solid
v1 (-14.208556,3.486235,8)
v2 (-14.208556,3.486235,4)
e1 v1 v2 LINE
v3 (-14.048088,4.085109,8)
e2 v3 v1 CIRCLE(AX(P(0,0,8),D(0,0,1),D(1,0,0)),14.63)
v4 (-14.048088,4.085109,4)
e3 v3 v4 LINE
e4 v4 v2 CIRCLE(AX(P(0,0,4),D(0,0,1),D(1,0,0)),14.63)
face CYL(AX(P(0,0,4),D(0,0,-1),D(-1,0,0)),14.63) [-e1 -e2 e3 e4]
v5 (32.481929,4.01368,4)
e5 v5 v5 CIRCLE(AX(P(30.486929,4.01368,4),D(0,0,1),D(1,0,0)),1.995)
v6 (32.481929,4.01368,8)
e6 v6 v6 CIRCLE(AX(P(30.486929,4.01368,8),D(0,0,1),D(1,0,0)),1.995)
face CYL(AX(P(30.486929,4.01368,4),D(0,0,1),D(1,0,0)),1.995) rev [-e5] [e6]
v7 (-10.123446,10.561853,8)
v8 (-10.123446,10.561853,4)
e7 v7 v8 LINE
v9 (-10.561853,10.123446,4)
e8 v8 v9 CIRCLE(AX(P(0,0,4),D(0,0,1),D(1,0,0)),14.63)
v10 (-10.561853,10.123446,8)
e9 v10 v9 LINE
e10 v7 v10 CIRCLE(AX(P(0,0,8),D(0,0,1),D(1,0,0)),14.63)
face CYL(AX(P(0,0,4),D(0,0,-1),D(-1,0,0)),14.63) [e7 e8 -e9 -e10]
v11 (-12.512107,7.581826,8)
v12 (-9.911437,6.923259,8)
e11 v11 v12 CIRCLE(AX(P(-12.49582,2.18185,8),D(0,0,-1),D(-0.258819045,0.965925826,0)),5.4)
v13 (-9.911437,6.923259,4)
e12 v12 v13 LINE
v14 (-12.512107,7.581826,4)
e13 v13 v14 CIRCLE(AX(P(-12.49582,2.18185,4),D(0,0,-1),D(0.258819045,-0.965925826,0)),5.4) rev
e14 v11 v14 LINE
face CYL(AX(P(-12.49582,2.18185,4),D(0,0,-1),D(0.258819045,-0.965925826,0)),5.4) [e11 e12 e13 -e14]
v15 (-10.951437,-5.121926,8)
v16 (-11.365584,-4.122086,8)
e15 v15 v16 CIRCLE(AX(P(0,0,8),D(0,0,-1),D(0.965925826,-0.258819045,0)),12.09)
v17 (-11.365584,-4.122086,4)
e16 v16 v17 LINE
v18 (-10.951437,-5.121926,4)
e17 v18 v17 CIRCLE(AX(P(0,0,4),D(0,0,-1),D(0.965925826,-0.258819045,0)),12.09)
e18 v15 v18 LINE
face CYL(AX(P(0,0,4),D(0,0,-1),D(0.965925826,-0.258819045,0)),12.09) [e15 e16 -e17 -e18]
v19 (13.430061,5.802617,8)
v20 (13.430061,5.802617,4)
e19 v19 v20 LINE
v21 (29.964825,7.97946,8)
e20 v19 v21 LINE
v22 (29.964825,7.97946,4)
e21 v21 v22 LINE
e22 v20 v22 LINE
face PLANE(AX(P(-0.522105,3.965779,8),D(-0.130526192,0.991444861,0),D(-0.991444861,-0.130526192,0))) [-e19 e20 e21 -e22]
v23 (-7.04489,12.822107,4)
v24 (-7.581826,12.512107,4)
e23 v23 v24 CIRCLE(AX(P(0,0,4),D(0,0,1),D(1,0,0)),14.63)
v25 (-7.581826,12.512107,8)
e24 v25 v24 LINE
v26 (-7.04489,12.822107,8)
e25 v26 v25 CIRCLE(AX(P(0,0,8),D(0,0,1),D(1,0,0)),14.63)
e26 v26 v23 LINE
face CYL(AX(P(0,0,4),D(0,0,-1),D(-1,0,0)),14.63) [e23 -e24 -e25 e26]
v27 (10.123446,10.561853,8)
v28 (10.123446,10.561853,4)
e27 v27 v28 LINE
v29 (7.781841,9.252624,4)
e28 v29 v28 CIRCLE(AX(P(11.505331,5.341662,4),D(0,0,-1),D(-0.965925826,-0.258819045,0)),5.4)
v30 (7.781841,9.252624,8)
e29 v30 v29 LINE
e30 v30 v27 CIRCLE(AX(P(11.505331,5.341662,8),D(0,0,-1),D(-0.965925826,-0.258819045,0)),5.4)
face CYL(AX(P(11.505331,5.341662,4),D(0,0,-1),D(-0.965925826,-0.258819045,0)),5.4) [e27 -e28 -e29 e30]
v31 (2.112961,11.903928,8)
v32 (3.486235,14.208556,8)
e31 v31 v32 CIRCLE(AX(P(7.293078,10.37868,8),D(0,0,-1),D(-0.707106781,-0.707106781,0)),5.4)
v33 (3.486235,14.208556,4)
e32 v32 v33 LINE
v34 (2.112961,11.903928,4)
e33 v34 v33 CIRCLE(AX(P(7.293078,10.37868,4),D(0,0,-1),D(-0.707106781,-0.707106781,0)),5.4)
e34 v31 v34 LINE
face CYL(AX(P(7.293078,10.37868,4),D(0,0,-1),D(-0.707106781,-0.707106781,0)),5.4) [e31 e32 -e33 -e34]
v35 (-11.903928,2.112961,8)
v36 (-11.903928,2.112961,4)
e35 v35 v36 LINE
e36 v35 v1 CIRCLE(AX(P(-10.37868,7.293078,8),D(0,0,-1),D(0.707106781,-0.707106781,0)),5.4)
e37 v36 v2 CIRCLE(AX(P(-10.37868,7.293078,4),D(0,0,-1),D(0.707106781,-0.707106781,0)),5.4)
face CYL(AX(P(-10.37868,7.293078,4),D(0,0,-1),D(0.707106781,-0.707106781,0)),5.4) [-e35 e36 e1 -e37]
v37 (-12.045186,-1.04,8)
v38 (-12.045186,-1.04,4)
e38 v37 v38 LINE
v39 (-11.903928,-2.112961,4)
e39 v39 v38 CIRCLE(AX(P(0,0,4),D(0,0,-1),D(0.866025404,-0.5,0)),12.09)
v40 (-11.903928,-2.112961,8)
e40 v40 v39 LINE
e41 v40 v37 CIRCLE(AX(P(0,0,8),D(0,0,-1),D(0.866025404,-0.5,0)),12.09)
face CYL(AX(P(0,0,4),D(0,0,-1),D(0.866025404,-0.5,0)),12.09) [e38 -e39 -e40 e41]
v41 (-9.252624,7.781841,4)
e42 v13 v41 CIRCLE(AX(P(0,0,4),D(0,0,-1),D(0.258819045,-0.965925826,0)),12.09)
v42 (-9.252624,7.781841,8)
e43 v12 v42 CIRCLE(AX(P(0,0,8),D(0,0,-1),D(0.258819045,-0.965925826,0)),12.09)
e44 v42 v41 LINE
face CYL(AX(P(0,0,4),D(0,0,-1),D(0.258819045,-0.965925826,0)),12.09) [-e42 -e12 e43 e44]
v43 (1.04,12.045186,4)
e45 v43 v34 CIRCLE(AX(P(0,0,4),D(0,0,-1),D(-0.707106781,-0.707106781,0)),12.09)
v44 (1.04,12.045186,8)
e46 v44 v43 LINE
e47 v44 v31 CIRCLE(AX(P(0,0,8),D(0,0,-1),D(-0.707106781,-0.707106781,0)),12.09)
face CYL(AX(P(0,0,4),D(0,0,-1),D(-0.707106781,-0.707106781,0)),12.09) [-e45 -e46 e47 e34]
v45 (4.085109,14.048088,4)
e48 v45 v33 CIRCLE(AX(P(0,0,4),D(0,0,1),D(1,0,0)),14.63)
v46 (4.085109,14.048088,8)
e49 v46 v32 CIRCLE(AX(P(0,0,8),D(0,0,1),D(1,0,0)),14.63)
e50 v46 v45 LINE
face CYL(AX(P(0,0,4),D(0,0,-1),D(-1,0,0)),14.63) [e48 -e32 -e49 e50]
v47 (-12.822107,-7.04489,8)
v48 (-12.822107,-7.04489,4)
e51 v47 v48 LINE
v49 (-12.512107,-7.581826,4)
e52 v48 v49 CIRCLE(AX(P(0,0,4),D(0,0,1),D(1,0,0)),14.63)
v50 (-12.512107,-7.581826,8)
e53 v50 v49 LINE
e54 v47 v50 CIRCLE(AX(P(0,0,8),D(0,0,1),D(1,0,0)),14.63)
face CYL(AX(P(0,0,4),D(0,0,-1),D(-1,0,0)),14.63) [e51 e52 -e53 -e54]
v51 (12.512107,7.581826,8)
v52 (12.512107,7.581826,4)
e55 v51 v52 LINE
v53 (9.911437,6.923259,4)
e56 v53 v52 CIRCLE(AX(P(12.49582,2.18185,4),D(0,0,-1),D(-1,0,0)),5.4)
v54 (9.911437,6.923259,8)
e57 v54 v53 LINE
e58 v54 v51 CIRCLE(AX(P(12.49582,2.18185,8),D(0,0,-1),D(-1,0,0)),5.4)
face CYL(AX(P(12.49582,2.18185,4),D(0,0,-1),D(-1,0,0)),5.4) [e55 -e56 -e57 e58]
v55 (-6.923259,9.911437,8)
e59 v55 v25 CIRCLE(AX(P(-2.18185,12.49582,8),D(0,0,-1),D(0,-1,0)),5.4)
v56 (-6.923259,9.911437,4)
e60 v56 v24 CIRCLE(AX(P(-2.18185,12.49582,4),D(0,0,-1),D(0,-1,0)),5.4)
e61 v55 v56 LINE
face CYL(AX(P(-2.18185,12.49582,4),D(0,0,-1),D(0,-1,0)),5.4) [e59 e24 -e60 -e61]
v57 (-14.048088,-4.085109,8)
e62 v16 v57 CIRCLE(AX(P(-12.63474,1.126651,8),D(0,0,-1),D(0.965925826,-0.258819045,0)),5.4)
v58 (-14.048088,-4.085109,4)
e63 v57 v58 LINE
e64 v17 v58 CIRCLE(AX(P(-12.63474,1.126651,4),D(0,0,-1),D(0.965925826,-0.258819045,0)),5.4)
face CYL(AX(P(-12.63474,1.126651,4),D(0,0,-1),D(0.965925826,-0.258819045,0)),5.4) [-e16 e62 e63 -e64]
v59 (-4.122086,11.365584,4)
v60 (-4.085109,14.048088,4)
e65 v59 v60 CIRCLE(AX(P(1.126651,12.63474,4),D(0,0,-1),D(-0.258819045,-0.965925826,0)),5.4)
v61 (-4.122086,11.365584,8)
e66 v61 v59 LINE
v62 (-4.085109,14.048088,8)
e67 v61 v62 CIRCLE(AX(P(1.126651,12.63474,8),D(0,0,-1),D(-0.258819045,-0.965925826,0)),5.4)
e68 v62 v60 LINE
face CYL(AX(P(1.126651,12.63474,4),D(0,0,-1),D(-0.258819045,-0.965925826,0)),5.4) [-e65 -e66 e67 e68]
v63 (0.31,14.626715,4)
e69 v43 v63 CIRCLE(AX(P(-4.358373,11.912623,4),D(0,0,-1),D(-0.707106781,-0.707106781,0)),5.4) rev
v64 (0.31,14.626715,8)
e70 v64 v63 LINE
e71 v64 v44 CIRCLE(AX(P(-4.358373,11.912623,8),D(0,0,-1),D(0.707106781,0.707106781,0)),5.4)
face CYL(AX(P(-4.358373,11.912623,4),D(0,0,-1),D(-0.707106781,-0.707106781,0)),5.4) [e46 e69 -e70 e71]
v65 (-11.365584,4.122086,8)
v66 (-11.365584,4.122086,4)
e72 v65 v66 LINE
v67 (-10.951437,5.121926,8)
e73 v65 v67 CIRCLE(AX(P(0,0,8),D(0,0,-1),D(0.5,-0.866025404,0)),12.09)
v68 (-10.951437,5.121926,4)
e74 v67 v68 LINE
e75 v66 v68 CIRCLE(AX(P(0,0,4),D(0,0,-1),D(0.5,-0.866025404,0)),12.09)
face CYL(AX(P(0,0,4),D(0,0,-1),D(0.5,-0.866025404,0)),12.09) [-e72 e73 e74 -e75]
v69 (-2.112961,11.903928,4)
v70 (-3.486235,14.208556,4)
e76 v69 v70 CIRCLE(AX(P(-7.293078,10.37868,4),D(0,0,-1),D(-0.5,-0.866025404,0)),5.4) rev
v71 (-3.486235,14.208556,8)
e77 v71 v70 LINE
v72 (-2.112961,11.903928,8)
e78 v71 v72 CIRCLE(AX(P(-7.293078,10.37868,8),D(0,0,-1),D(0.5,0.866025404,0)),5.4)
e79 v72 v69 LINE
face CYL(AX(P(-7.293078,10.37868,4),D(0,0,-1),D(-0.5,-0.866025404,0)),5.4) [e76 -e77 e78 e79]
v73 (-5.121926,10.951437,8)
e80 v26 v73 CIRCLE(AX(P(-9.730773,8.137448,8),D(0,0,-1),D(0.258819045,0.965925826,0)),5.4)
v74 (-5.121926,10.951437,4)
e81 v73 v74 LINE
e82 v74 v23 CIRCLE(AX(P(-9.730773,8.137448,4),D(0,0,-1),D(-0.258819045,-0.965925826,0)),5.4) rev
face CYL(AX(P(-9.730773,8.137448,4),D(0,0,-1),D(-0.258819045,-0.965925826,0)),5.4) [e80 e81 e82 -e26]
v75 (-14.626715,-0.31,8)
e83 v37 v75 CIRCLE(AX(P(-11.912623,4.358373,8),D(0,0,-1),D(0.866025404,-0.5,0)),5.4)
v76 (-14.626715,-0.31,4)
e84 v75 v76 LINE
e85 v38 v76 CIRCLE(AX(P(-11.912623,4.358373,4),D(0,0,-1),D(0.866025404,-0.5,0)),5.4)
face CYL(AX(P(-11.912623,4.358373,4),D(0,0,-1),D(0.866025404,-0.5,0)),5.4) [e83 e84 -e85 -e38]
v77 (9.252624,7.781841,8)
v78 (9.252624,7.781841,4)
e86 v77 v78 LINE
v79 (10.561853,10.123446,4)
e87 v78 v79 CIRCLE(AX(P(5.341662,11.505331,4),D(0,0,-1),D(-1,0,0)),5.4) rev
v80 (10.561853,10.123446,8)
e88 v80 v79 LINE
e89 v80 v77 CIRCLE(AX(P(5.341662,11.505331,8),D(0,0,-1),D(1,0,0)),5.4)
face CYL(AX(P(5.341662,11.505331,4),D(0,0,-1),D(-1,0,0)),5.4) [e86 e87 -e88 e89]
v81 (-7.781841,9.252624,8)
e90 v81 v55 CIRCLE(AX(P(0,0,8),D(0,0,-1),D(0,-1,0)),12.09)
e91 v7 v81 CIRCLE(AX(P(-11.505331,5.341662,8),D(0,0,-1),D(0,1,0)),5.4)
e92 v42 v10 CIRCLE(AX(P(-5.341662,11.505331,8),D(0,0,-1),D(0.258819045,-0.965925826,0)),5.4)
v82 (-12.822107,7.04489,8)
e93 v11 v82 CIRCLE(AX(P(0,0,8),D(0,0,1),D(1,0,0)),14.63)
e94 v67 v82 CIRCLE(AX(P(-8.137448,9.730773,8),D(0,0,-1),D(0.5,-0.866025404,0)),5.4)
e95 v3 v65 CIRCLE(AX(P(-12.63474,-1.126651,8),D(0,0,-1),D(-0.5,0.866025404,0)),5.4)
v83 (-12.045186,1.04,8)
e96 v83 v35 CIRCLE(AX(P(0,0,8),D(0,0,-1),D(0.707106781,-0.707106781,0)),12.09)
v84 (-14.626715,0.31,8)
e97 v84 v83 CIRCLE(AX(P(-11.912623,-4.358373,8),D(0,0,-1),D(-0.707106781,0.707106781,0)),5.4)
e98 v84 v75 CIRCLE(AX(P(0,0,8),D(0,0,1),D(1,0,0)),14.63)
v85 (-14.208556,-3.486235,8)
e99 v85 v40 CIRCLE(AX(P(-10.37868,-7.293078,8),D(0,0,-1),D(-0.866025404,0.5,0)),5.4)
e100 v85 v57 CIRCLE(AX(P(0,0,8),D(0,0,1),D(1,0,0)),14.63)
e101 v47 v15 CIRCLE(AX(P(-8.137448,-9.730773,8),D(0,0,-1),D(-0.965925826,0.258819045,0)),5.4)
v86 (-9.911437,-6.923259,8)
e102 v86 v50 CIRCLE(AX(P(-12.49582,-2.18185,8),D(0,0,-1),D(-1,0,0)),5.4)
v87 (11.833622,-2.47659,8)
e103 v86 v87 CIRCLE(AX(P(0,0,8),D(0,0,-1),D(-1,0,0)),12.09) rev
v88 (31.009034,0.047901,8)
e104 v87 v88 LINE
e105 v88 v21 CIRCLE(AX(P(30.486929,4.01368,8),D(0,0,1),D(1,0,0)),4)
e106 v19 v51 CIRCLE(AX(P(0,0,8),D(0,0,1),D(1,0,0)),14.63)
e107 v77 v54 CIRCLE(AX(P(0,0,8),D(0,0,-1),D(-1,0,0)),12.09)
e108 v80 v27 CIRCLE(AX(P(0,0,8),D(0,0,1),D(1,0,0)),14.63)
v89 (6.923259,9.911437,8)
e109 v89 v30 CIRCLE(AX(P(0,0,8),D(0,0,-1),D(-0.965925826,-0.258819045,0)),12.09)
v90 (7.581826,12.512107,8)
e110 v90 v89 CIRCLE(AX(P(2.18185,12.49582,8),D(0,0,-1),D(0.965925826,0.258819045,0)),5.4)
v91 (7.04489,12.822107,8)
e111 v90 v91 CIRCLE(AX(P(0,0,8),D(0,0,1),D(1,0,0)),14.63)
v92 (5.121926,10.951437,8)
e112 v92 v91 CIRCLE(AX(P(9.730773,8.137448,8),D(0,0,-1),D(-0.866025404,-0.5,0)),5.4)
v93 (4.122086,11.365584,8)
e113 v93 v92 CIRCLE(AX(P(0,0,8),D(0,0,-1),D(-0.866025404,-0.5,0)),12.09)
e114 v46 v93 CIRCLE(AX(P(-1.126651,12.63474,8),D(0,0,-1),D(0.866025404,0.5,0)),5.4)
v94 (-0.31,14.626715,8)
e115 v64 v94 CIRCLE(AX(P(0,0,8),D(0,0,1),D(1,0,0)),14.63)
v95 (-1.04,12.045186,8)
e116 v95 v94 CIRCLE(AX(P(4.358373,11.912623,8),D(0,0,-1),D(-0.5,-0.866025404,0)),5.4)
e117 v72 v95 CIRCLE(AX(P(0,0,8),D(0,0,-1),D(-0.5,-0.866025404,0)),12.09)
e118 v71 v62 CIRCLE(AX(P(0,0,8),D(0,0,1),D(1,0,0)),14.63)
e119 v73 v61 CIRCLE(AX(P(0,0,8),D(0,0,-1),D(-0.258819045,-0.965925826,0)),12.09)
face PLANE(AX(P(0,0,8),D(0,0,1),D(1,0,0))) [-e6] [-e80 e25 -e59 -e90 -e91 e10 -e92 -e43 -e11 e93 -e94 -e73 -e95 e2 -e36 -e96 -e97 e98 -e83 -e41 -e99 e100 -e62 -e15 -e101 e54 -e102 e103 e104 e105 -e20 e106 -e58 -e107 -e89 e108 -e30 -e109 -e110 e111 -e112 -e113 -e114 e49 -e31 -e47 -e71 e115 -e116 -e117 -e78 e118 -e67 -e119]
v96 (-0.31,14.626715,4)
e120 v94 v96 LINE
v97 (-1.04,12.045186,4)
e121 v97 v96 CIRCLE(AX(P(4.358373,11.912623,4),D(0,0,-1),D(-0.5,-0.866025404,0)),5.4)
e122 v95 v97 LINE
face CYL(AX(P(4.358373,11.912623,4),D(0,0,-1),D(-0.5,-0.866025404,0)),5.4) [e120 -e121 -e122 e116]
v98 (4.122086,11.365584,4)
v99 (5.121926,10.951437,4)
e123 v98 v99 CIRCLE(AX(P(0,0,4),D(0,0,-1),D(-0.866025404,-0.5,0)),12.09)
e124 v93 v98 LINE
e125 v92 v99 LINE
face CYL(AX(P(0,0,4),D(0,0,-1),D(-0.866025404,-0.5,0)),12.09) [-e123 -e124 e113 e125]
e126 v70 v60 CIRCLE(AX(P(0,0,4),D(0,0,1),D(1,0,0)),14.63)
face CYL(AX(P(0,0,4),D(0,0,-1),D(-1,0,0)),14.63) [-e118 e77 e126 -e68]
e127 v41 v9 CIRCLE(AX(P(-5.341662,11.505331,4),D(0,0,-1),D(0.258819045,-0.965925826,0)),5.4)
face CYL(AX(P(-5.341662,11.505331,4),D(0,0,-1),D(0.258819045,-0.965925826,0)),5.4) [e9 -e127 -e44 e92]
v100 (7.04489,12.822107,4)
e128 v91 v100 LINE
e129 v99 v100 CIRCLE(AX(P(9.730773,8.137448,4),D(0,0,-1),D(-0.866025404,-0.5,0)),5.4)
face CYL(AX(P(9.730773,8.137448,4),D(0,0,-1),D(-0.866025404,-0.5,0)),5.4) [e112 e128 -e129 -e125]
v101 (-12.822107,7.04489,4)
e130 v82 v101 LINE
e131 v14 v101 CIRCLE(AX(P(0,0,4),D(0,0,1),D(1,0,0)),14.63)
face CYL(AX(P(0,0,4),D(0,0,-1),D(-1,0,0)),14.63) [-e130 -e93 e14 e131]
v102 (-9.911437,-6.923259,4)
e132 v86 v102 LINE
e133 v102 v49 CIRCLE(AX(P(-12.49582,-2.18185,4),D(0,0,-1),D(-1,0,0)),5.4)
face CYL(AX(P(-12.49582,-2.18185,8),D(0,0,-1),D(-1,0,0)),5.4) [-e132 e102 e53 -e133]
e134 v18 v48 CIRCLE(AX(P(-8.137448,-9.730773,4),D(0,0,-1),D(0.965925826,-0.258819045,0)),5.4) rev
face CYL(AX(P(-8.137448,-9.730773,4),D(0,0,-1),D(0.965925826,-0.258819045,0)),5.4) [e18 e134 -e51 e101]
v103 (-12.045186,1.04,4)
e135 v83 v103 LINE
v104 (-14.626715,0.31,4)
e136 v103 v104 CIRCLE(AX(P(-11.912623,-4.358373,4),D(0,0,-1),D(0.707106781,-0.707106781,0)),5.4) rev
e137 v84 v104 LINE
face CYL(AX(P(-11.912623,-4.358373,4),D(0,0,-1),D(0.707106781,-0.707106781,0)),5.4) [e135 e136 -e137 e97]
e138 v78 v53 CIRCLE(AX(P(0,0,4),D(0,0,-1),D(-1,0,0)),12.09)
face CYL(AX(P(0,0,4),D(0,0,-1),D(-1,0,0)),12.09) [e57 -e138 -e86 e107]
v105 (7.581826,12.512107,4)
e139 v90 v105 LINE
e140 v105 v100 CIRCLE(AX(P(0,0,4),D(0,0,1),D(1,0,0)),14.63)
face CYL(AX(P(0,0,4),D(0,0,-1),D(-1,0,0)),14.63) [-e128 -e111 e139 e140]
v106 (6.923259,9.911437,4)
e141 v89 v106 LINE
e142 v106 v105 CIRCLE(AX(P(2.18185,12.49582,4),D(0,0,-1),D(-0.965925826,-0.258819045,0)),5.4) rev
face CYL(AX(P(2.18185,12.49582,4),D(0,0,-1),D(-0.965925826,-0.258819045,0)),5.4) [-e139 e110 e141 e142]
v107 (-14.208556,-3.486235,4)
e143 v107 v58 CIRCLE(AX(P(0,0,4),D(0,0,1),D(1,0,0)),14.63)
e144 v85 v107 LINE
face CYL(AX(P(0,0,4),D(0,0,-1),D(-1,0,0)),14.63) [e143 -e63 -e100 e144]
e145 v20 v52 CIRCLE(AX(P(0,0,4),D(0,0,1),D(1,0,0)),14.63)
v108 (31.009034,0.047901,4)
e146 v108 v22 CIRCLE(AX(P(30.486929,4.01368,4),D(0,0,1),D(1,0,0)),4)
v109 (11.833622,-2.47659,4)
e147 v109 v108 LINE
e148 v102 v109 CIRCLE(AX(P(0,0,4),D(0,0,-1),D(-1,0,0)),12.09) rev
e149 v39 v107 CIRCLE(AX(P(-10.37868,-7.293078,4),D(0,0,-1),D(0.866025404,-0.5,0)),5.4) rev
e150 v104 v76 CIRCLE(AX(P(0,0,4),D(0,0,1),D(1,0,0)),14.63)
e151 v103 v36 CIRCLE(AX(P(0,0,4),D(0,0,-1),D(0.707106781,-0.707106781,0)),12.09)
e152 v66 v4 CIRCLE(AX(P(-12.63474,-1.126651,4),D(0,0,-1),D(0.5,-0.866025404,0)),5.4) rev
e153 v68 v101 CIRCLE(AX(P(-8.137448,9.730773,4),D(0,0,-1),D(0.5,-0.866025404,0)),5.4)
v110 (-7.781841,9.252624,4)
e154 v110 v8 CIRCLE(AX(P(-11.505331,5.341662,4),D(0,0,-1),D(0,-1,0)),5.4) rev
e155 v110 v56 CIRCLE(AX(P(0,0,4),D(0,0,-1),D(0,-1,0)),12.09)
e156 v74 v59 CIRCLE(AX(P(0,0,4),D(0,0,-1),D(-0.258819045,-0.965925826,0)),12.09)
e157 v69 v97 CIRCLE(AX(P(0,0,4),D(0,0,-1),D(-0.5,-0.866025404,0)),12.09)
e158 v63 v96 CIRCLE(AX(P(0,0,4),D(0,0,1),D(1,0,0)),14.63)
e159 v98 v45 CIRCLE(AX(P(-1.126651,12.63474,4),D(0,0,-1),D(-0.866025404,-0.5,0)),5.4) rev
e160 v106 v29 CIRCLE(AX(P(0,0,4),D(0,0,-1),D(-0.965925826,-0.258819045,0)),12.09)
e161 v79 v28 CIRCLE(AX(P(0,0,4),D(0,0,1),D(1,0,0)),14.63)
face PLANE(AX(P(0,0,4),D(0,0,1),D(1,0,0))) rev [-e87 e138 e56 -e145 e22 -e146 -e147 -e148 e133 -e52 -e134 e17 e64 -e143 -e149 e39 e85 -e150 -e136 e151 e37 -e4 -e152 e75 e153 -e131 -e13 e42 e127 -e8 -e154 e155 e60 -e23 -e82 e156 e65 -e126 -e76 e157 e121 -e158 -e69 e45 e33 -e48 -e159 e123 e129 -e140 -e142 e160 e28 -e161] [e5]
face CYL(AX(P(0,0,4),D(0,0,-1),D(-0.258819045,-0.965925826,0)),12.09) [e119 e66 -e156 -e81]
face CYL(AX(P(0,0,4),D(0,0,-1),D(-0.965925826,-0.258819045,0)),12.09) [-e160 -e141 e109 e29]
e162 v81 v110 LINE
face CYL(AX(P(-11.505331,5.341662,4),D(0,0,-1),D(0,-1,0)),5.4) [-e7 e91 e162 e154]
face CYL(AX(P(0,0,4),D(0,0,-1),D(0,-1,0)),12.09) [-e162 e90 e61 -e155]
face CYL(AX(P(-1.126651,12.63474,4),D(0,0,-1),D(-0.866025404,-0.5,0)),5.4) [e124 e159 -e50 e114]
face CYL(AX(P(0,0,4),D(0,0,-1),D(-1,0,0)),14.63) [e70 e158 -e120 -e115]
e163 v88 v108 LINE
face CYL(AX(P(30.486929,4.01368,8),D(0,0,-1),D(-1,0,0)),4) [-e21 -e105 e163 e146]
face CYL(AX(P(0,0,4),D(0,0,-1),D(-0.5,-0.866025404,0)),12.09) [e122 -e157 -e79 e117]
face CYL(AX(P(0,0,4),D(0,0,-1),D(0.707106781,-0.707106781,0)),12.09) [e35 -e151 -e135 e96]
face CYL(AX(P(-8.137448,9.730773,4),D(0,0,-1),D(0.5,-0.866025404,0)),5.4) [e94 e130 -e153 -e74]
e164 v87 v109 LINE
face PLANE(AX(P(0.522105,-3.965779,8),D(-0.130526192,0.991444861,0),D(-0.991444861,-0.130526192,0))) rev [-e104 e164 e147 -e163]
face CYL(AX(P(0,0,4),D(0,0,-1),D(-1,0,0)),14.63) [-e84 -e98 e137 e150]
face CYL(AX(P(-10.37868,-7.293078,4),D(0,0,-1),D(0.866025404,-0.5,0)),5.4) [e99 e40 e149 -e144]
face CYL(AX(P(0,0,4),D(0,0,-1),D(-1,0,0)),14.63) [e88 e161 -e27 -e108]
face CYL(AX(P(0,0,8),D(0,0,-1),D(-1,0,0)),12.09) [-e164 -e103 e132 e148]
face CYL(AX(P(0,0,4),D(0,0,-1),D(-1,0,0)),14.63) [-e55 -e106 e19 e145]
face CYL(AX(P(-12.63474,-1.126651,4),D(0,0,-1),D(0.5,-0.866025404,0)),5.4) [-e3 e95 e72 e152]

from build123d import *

# Parameters (mm, degrees)
SKETCH2_R           = 1.75
SKETCH2_R_2         = 1.995
BOSS_EXTRUDE1_DEPTH = 4
SKETCH4_R           = 1.3
SKETCH4_R_2         = 2.4
CUT_EXTRUDE1_DEPTH  = 38.915688046
SKETCH6_R           = 12.09
BOSS_EXTRUDE3_DEPTH = 4
CUT_EXTRUDE5_DEPTH  = 4
SKETCH10_W          = 77.083207297
SKETCH10_H          = 41.615870942
CUT_EXTRUDE6_DEPTH  = 4
CIRPATTERN3_START   = 4
CIRPATTERN3_DEPTH   = 4
SKETCH11_R          = 1.995
CUT_EXTRUDE7_DEPTH  = 4
CUT_EXTRUDE8_DEPTH  = 4


# Read off the part's stored shape, not the designer's step: CirPattern3
with BuildPart() as part:
    # Sketch2 → Boss-Extrude1 (new body)
    with BuildSketch(Plane.XY):
        with BuildLine():
            ThreePointArc((30.75, -4), (34.75, 0), (30.75, 4))
            Line((30.75, 4), (14.072558403, 4))
            ThreePointArc((14.072558403, 4), (14.06038767, 4.04257326), (14.048088143, 4.085109489))
            ThreePointArc((14.048088143, 4.085109489), (12.709169027, 4.272836063), (11.365584201, 4.122086336))
            ThreePointArc((11.365584201, 4.122086336), (11.169703548, 4.626642697), (10.951436862, 5.12192646))
            ThreePointArc((10.951436862, 5.12192646), (12.008090957, 5.965388247), (12.82210701, 7.044889767))
            ThreePointArc((12.82210701, 7.044889767), (12.669951657, 7.315), (12.51210701, 7.581825517))
            ThreePointArc((12.51210701, 7.581825517), (11.170223244, 7.416617696), (9.911436862, 6.9232593))
            ThreePointArc((9.911436862, 6.9232593), (9.591641884, 7.359925677), (9.252623584, 7.781841479))
            ThreePointArc((9.252623584, 7.781841479), (10.05496909, 8.870045207), (10.561852666, 10.123446462))
            ThreePointArc((10.561852666, 10.123446462), (10.344972209, 10.344972209), (10.123446462, 10.561852666))
            ThreePointArc((10.123446462, 10.561852666), (8.870045207, 10.05496909), (7.781841479, 9.252623584))
            ThreePointArc((7.781841479, 9.252623584), (7.359925677, 9.591641884), (6.9232593, 9.911436862))
            ThreePointArc((6.9232593, 9.911436862), (7.416617696, 11.170223244), (7.581825517, 12.51210701))
            ThreePointArc((7.581825517, 12.51210701), (7.315, 12.669951657), (7.044889767, 12.82210701))
            ThreePointArc((7.044889767, 12.82210701), (5.965388247, 12.008090957), (5.12192646, 10.951436862))
            ThreePointArc((5.12192646, 10.951436862), (4.626642697, 11.169703548), (4.122086336, 11.365584201))
            ThreePointArc((4.122086336, 11.365584201), (4.272836063, 12.709169027), (4.085109489, 14.048088143))
            ThreePointArc((4.085109489, 14.048088143), (3.78652263, 14.131494839), (3.486235477, 14.208555951))
            ThreePointArc((3.486235477, 14.208555951), (2.654199937, 13.14288127), (2.112960617, 11.903927815))
            ThreePointArc((2.112960617, 11.903927815), (1.578061664, 11.986568374), (1.04, 12.04518576))
            ThreePointArc((1.04, 12.04518576), (0.837867713, 13.382005944), (0.31, 14.626715284))
            ThreePointArc((0.31, 14.626715284), (0, 14.63), (-0.31, 14.626715284))
            ThreePointArc((-0.31, 14.626715284), (-0.837867713, 13.382005944), (-1.04, 12.04518576))
            ThreePointArc((-1.04, 12.04518576), (-1.578061664, 11.986568374), (-2.112960617, 11.903927815))
            ThreePointArc((-2.112960617, 11.903927815), (-2.654199937, 13.14288127), (-3.486235477, 14.208555951))
            ThreePointArc((-3.486235477, 14.208555951), (-3.78652263, 14.131494839), (-4.085109489, 14.048088143))
            ThreePointArc((-4.085109489, 14.048088143), (-4.272836063, 12.709169027), (-4.122086336, 11.365584201))
            ThreePointArc((-4.122086336, 11.365584201), (-4.626642697, 11.169703548), (-5.12192646, 10.951436862))
            ThreePointArc((-5.12192646, 10.951436862), (-5.965388247, 12.008090957), (-7.044889767, 12.82210701))
            ThreePointArc((-7.044889767, 12.82210701), (-7.315, 12.669951657), (-7.581825517, 12.51210701))
            ThreePointArc((-7.581825517, 12.51210701), (-7.416617696, 11.170223244), (-6.9232593, 9.911436862))
            ThreePointArc((-6.9232593, 9.911436862), (-7.359925677, 9.591641884), (-7.781841479, 9.252623584))
            ThreePointArc((-7.781841479, 9.252623584), (-8.870045207, 10.05496909), (-10.123446462, 10.561852666))
            ThreePointArc((-10.123446462, 10.561852666), (-10.344972209, 10.344972209), (-10.561852666, 10.123446462))
            ThreePointArc((-10.561852666, 10.123446462), (-10.05496909, 8.870045207), (-9.252623584, 7.781841479))
            ThreePointArc((-9.252623584, 7.781841479), (-9.591641884, 7.359925677), (-9.911436862, 6.9232593))
            ThreePointArc((-9.911436862, 6.9232593), (-11.170223244, 7.416617696), (-12.51210701, 7.581825517))
            ThreePointArc((-12.51210701, 7.581825517), (-12.669951657, 7.315), (-12.82210701, 7.044889767))
            ThreePointArc((-12.82210701, 7.044889767), (-12.008090957, 5.965388247), (-10.951436862, 5.12192646))
            ThreePointArc((-10.951436862, 5.12192646), (-11.169703548, 4.626642697), (-11.365584201, 4.122086336))
            ThreePointArc((-11.365584201, 4.122086336), (-12.709169027, 4.272836063), (-14.048088143, 4.085109489))
            ThreePointArc((-14.048088143, 4.085109489), (-14.131494839, 3.78652263), (-14.208555951, 3.486235477))
            ThreePointArc((-14.208555951, 3.486235477), (-13.14288127, 2.654199937), (-11.903927815, 2.112960617))
            ThreePointArc((-11.903927815, 2.112960617), (-11.986568374, 1.578061664), (-12.04518576, 1.04))
            ThreePointArc((-12.04518576, 1.04), (-13.382005944, 0.837867713), (-14.626715284, 0.31))
            ThreePointArc((-14.626715284, 0.31), (-14.63, 0), (-14.626715284, -0.31))
            ThreePointArc((-14.626715284, -0.31), (-13.382005944, -0.837867713), (-12.04518576, -1.04))
            ThreePointArc((-12.04518576, -1.04), (-11.986568374, -1.578061664), (-11.903927815, -2.112960617))
            ThreePointArc((-11.903927815, -2.112960617), (-13.14288127, -2.654199937), (-14.208555951, -3.486235477))
            ThreePointArc((-14.208555951, -3.486235477), (-14.131494839, -3.78652263), (-14.048088143, -4.085109489))
            ThreePointArc((-14.048088143, -4.085109489), (-12.709169027, -4.272836063), (-11.365584201, -4.122086336))
            ThreePointArc((-11.365584201, -4.122086336), (0.064808849, -12.089826294), (11.409123542, -4))
            Line((11.409123542, -4), (30.75, -4))
        make_face()
        Circle(SKETCH2_R, mode=Mode.SUBTRACT)
        with Locations((30.75, 0)):
            Circle(SKETCH2_R_2, mode=Mode.SUBTRACT)
    extrude(amount=BOSS_EXTRUDE1_DEPTH)

    # Sketch4 → Cut-Extrude1 (cut, through all)
    with BuildSketch(Plane.XY.offset(4)):
        with Locations((4.5, 0)):
            Circle(SKETCH4_R)
        with Locations((-4.5, 0)):
            Circle(SKETCH4_R)
        Circle(SKETCH4_R_2)
    extrude(amount=-CUT_EXTRUDE1_DEPTH, mode=Mode.SUBTRACT)

    # Sketch6 → Boss-Extrude3 (add)
    with BuildSketch(Plane.XY.offset(4)):
        with BuildLine():
            Line((-0.522104769, 3.965779445), (0, 4.034515842))
            Line((0, 4.034515842), (0, 12.09))
            ThreePointArc((0, 12.09), (-9.383764517, -7.623192474), (11.833621678, -2.476589993))
            Line((11.833621678, -2.476589993), (0.522104769, -3.965779445))
            ThreePointArc((0.522104769, -3.965779445), (-3.965779445, -0.522104769), (-0.522104769, 3.965779445))
        make_face()
        with BuildLine():
            Line((0, 12.09), (0, 4.034515842))
            Line((0, 4.034515842), (1.120574863, 4.182042322))
            Line((1.120574863, 4.182042322), (3.129122255, 11.67804324))
            ThreePointArc((3.129122255, 11.67804324), (1.578061664, 11.986568374), (0, 12.09))
        make_face()
        with BuildLine():
            Line((3.129122255, 11.67804324), (1.120574863, 4.182042322))
            Line((1.120574863, 4.182042322), (10.78941214, 5.454968898))
            ThreePointArc((10.78941214, 5.454968898), (7.623192474, 9.383764517), (3.129122255, 11.67804324))
        make_face()
        with BuildLine():
            Line((1.120574863, 4.182042322), (0, 0))
            Line((0, 0), (0, 4.034515842))
            Line((0, 4.034515842), (-0.522104769, 3.965779445))
            ThreePointArc((-0.522104769, 3.965779445), (-3.965779445, -0.522104769), (0.522104769, -3.965779445))
            Line((0.522104769, -3.965779445), (11.833621678, -2.476589993))
            ThreePointArc((11.833621678, -2.476589993), (12.025734615, -1.24491243), (12.09, 0))
            ThreePointArc((12.09, 0), (11.76035911, 2.80393538), (10.78941214, 5.454968898))
            Line((10.78941214, 5.454968898), (1.120574863, 4.182042322))
        make_face()
        with BuildLine():
            Line((13.430060946, 5.802616909), (10.78941214, 5.454968898))
            ThreePointArc((10.78941214, 5.454968898), (11.76035911, 2.80393538), (12.09, 0))
            ThreePointArc((12.09, 0), (12.025734615, -1.24491243), (11.833621678, -2.476589993))
            Line((11.833621678, -2.476589993), (14.474270484, -2.128941982))
            ThreePointArc((14.474270484, -2.128941982), (14.59101568, -1.067315048), (14.63, 0))
            ThreePointArc((14.63, 0), (14.32687495, 2.962693737), (13.430060946, 5.802616909))
        make_face()
        with BuildLine():
            Line((29.964824718, 7.979459856), (13.430060946, 5.802616909))
            ThreePointArc((13.430060946, 5.802616909), (14.32687495, 2.962693737), (14.63, 0))
            ThreePointArc((14.63, 0), (14.59101568, -1.067315048), (14.474270484, -2.128941982))
            Line((14.474270484, -2.128941982), (31.009034256, 0.047900965))
            ThreePointArc((31.009034256, 0.047900965), (34.452708933, 4.53578518), (29.964824718, 7.979459856))
        make_face()
        with BuildLine():
            Line((3.78652263, 14.131494839), (3.129122255, 11.67804324))
            ThreePointArc((3.129122255, 11.67804324), (7.623192474, 9.383764517), (10.78941214, 5.454968898))
            Line((10.78941214, 5.454968898), (13.430060946, 5.802616909))
            ThreePointArc((13.430060946, 5.802616909), (9.562700424, 11.07211184), (3.78652263, 14.131494839))
        make_face()
        Circle(SKETCH6_R)
        with BuildLine():
            Line((0, 0), (3.78652263, 14.131494839))
            ThreePointArc((3.78652263, 14.131494839), (1.909598192, 14.504838322), (0, 14.63))
            Line((0, 14.63), (0, 0))
        make_face()
        with BuildLine():
            ThreePointArc((11.833621678, -2.476589993), (-9.383764517, -7.623192474), (0, 12.09))
            Line((0, 12.09), (0, 14.63))
            ThreePointArc((0, 14.63), (-11.07211184, -9.562700424), (14.474270484, -2.128941982))
            Line((14.474270484, -2.128941982), (11.833621678, -2.476589993))
        make_face()
        Polygon((0, 4.034515842), (0, 0), (1.120574863, 4.182042322), align=None)
    extrude(amount=BOSS_EXTRUDE3_DEPTH)

    # Sketch7 → Cut-Extrude5 (cut)
    with BuildSketch(Plane.XY.offset(4)):
        with BuildLine():
            ThreePointArc((9.911436862, 6.9232593), (11.170223244, 7.416617696), (12.51210701, 7.581825517))
            ThreePointArc((12.51210701, 7.581825517), (11.606759368, 8.906179706), (10.561852666, 10.123446462))
            ThreePointArc((10.561852666, 10.123446462), (10.05496909, 8.870045207), (9.252623584, 7.781841479))
            ThreePointArc((9.252623584, 7.781841479), (9.591641884, 7.359925677), (9.911436862, 6.9232593))
        make_face()
    extrude(amount=CUT_EXTRUDE5_DEPTH, mode=Mode.SUBTRACT)

    # Sketch10 → Cut-Extrude6 (cut)
    # profile 1 of 2: a face of its own
    with BuildSketch(Plane(origin=(0, 0, 0), x_dir=(-1, 0, 0), z_dir=(0, 0, -1))):
        with Locations((-5.704161283, 1.736795553)):
            Rectangle(SKETCH10_W, SKETCH10_H)
        Polygon((-12.51210701, 7.581825517), (-10.123446462, 10.561852666), (0, 0), align=None, mode=Mode.SUBTRACT)
    # profile 2 of 2: a face of its own
    with BuildSketch(Plane(origin=(0, 0, 0), x_dir=(-1, 0, 0), z_dir=(0, 0, -1))):
        Polygon((-10.123446462, 10.561852666), (0, 0), (-12.51210701, 7.581825517), align=None)
    extrude(amount=-CUT_EXTRUDE6_DEPTH, mode=Mode.SUBTRACT)

    # CirPattern3 outline → CirPattern3 (cut)
    with BuildSketch(Plane.XY.offset(CIRPATTERN3_START)):
        with BuildLine():
            ThreePointArc((-12.82210701, -7.044889767), (-12.008090957, -5.965388247), (-10.951436862, -5.12192646))
            ThreePointArc((-10.951436862, -5.12192646), (-11.169703548, -4.626642697), (-11.365584201, -4.122086336))
            ThreePointArc((-11.365584201, -4.122086336), (-12.709169027, -4.272836063), (-14.048088143, -4.085109489))
            ThreePointArc((-14.048088143, -4.085109489), (-13.516357561, -5.598658615), (-12.82210701, -7.044889767))
        make_face()
        with BuildLine():
            ThreePointArc((10.123446462, 10.561852666), (8.906179707, 11.606759369), (7.581825517, 12.51210701))
            ThreePointArc((7.581825517, 12.51210701), (7.416617696, 11.170223245), (6.9232593, 9.911436862))
            ThreePointArc((6.9232593, 9.911436862), (7.359925677, 9.591641884), (7.781841479, 9.252623584))
            ThreePointArc((7.781841479, 9.252623584), (8.870045207, 10.05496909), (10.123446462, 10.561852666))
        make_face()
        with BuildLine():
            ThreePointArc((7.044889767, 12.82210701), (5.598658616, 13.516357561), (4.085109489, 14.048088143))
            ThreePointArc((4.085109489, 14.048088143), (4.272836063, 12.709169027), (4.122086336, 11.365584201))
            ThreePointArc((4.122086336, 11.365584201), (4.626642697, 11.169703548), (5.12192646, 10.951436862))
            ThreePointArc((5.12192646, 10.951436862), (5.965388247, 12.008090957), (7.044889767, 12.82210701))
        make_face()
        with BuildLine():
            ThreePointArc((3.486235477, 14.208555951), (1.909598192, 14.504838322), (0.31, 14.626715284))
            ThreePointArc((0.31, 14.626715284), (0.837867713, 13.382005944), (1.04, 12.04518576))
            ThreePointArc((1.04, 12.04518576), (1.578061664, 11.986568374), (2.112960617, 11.903927815))
            ThreePointArc((2.112960617, 11.903927815), (2.654199937, 13.14288127), (3.486235477, 14.208555951))
        make_face()
        with BuildLine():
            ThreePointArc((-0.31, 14.626715284), (-1.909598192, 14.504838322), (-3.486235477, 14.208555951))
            ThreePointArc((-3.486235477, 14.208555951), (-2.654199937, 13.14288127), (-2.112960617, 11.903927815))
            ThreePointArc((-2.112960617, 11.903927815), (-1.578061664, 11.986568374), (-1.04, 12.04518576))
            ThreePointArc((-1.04, 12.04518576), (-0.837867713, 13.382005944), (-0.31, 14.626715284))
        make_face()
        with BuildLine():
            ThreePointArc((-4.085109489, 14.048088143), (-5.598658616, 13.516357561), (-7.044889767, 12.82210701))
            ThreePointArc((-7.044889767, 12.82210701), (-5.965388247, 12.008090957), (-5.12192646, 10.951436862))
            ThreePointArc((-5.12192646, 10.951436862), (-4.626642697, 11.169703548), (-4.122086336, 11.365584201))
            ThreePointArc((-4.122086336, 11.365584201), (-4.272836063, 12.709169027), (-4.085109489, 14.048088143))
        make_face()
        with BuildLine():
            ThreePointArc((-7.581825517, 12.51210701), (-8.906179706, 11.606759368), (-10.123446462, 10.561852666))
            ThreePointArc((-10.123446462, 10.561852666), (-8.870045207, 10.05496909), (-7.781841479, 9.252623584))
            ThreePointArc((-7.781841479, 9.252623584), (-7.359925677, 9.591641884), (-6.9232593, 9.911436862))
            ThreePointArc((-6.9232593, 9.911436862), (-7.416617696, 11.170223245), (-7.581825517, 12.51210701))
        make_face()
        with BuildLine():
            ThreePointArc((-10.561852666, 10.123446462), (-11.606759368, 8.906179706), (-12.51210701, 7.581825517))
            ThreePointArc((-12.51210701, 7.581825517), (-11.170223245, 7.416617696), (-9.911436862, 6.9232593))
            ThreePointArc((-9.911436862, 6.9232593), (-9.591641884, 7.359925677), (-9.252623584, 7.781841479))
            ThreePointArc((-9.252623584, 7.781841479), (-10.05496909, 8.870045207), (-10.561852666, 10.123446462))
        make_face()
        with BuildLine():
            ThreePointArc((-12.82210701, 7.044889767), (-13.516357561, 5.598658616), (-14.048088143, 4.085109489))
            ThreePointArc((-14.048088143, 4.085109489), (-12.709169027, 4.272836063), (-11.365584201, 4.122086336))
            ThreePointArc((-11.365584201, 4.122086336), (-11.169703548, 4.626642697), (-10.951436862, 5.12192646))
            ThreePointArc((-10.951436862, 5.12192646), (-12.008090957, 5.965388247), (-12.82210701, 7.044889767))
        make_face()
        with BuildLine():
            ThreePointArc((-14.20855595, 3.486235477), (-14.504838322, 1.909598192), (-14.626715284, 0.31))
            ThreePointArc((-14.626715284, 0.31), (-13.382005944, 0.837867713), (-12.04518576, 1.04))
            ThreePointArc((-12.04518576, 1.04), (-11.986568374, 1.578061664), (-11.903927815, 2.112960617))
            ThreePointArc((-11.903927815, 2.112960617), (-13.14288127, 2.654199937), (-14.20855595, 3.486235477))
        make_face()
        with BuildLine():
            ThreePointArc((-14.626715284, -0.31), (-14.504838322, -1.909598192), (-14.20855595, -3.486235477))
            ThreePointArc((-14.20855595, -3.486235477), (-13.14288127, -2.654199937), (-11.903927815, -2.112960617))
            ThreePointArc((-11.903927815, -2.112960617), (-11.986568374, -1.578061664), (-12.04518576, -1.04))
            ThreePointArc((-12.04518576, -1.04), (-13.382005944, -0.837867713), (-14.626715284, -0.31))
        make_face()
    extrude(amount=CIRPATTERN3_DEPTH, mode=Mode.SUBTRACT)

    # Sketch11 → Cut-Extrude7 (cut)
    with BuildSketch(Plane.XY.offset(8)):
        with Locations((30.486929487, 4.013680411)):
            Circle(SKETCH11_R)
    extrude(amount=-CUT_EXTRUDE7_DEPTH, mode=Mode.SUBTRACT)

    # Sketch12 → Cut-Extrude8 (cut)
    with BuildSketch(Plane(origin=(0, 0, 4), x_dir=(-1, 0, 0), z_dir=(0, 0, -1))):
        with BuildLine():
            Line((-11.833621678, -2.476589993), (-14.474270484, -2.128941982))
            ThreePointArc((-14.474270484, -2.128941982), (-2.897586252, -14.340184584), (12.51210701, -7.581825517))
            ThreePointArc((12.51210701, -7.581825517), (11.170223244, -7.416617696), (9.911436862, -6.9232593))
            ThreePointArc((9.911436862, -6.9232593), (-2.42217167, -11.844880092), (-11.833621678, -2.476589993))
        make_face()
    extrude(amount=-CUT_EXTRUDE8_DEPTH, mode=Mode.SUBTRACT)


solid = part.part
